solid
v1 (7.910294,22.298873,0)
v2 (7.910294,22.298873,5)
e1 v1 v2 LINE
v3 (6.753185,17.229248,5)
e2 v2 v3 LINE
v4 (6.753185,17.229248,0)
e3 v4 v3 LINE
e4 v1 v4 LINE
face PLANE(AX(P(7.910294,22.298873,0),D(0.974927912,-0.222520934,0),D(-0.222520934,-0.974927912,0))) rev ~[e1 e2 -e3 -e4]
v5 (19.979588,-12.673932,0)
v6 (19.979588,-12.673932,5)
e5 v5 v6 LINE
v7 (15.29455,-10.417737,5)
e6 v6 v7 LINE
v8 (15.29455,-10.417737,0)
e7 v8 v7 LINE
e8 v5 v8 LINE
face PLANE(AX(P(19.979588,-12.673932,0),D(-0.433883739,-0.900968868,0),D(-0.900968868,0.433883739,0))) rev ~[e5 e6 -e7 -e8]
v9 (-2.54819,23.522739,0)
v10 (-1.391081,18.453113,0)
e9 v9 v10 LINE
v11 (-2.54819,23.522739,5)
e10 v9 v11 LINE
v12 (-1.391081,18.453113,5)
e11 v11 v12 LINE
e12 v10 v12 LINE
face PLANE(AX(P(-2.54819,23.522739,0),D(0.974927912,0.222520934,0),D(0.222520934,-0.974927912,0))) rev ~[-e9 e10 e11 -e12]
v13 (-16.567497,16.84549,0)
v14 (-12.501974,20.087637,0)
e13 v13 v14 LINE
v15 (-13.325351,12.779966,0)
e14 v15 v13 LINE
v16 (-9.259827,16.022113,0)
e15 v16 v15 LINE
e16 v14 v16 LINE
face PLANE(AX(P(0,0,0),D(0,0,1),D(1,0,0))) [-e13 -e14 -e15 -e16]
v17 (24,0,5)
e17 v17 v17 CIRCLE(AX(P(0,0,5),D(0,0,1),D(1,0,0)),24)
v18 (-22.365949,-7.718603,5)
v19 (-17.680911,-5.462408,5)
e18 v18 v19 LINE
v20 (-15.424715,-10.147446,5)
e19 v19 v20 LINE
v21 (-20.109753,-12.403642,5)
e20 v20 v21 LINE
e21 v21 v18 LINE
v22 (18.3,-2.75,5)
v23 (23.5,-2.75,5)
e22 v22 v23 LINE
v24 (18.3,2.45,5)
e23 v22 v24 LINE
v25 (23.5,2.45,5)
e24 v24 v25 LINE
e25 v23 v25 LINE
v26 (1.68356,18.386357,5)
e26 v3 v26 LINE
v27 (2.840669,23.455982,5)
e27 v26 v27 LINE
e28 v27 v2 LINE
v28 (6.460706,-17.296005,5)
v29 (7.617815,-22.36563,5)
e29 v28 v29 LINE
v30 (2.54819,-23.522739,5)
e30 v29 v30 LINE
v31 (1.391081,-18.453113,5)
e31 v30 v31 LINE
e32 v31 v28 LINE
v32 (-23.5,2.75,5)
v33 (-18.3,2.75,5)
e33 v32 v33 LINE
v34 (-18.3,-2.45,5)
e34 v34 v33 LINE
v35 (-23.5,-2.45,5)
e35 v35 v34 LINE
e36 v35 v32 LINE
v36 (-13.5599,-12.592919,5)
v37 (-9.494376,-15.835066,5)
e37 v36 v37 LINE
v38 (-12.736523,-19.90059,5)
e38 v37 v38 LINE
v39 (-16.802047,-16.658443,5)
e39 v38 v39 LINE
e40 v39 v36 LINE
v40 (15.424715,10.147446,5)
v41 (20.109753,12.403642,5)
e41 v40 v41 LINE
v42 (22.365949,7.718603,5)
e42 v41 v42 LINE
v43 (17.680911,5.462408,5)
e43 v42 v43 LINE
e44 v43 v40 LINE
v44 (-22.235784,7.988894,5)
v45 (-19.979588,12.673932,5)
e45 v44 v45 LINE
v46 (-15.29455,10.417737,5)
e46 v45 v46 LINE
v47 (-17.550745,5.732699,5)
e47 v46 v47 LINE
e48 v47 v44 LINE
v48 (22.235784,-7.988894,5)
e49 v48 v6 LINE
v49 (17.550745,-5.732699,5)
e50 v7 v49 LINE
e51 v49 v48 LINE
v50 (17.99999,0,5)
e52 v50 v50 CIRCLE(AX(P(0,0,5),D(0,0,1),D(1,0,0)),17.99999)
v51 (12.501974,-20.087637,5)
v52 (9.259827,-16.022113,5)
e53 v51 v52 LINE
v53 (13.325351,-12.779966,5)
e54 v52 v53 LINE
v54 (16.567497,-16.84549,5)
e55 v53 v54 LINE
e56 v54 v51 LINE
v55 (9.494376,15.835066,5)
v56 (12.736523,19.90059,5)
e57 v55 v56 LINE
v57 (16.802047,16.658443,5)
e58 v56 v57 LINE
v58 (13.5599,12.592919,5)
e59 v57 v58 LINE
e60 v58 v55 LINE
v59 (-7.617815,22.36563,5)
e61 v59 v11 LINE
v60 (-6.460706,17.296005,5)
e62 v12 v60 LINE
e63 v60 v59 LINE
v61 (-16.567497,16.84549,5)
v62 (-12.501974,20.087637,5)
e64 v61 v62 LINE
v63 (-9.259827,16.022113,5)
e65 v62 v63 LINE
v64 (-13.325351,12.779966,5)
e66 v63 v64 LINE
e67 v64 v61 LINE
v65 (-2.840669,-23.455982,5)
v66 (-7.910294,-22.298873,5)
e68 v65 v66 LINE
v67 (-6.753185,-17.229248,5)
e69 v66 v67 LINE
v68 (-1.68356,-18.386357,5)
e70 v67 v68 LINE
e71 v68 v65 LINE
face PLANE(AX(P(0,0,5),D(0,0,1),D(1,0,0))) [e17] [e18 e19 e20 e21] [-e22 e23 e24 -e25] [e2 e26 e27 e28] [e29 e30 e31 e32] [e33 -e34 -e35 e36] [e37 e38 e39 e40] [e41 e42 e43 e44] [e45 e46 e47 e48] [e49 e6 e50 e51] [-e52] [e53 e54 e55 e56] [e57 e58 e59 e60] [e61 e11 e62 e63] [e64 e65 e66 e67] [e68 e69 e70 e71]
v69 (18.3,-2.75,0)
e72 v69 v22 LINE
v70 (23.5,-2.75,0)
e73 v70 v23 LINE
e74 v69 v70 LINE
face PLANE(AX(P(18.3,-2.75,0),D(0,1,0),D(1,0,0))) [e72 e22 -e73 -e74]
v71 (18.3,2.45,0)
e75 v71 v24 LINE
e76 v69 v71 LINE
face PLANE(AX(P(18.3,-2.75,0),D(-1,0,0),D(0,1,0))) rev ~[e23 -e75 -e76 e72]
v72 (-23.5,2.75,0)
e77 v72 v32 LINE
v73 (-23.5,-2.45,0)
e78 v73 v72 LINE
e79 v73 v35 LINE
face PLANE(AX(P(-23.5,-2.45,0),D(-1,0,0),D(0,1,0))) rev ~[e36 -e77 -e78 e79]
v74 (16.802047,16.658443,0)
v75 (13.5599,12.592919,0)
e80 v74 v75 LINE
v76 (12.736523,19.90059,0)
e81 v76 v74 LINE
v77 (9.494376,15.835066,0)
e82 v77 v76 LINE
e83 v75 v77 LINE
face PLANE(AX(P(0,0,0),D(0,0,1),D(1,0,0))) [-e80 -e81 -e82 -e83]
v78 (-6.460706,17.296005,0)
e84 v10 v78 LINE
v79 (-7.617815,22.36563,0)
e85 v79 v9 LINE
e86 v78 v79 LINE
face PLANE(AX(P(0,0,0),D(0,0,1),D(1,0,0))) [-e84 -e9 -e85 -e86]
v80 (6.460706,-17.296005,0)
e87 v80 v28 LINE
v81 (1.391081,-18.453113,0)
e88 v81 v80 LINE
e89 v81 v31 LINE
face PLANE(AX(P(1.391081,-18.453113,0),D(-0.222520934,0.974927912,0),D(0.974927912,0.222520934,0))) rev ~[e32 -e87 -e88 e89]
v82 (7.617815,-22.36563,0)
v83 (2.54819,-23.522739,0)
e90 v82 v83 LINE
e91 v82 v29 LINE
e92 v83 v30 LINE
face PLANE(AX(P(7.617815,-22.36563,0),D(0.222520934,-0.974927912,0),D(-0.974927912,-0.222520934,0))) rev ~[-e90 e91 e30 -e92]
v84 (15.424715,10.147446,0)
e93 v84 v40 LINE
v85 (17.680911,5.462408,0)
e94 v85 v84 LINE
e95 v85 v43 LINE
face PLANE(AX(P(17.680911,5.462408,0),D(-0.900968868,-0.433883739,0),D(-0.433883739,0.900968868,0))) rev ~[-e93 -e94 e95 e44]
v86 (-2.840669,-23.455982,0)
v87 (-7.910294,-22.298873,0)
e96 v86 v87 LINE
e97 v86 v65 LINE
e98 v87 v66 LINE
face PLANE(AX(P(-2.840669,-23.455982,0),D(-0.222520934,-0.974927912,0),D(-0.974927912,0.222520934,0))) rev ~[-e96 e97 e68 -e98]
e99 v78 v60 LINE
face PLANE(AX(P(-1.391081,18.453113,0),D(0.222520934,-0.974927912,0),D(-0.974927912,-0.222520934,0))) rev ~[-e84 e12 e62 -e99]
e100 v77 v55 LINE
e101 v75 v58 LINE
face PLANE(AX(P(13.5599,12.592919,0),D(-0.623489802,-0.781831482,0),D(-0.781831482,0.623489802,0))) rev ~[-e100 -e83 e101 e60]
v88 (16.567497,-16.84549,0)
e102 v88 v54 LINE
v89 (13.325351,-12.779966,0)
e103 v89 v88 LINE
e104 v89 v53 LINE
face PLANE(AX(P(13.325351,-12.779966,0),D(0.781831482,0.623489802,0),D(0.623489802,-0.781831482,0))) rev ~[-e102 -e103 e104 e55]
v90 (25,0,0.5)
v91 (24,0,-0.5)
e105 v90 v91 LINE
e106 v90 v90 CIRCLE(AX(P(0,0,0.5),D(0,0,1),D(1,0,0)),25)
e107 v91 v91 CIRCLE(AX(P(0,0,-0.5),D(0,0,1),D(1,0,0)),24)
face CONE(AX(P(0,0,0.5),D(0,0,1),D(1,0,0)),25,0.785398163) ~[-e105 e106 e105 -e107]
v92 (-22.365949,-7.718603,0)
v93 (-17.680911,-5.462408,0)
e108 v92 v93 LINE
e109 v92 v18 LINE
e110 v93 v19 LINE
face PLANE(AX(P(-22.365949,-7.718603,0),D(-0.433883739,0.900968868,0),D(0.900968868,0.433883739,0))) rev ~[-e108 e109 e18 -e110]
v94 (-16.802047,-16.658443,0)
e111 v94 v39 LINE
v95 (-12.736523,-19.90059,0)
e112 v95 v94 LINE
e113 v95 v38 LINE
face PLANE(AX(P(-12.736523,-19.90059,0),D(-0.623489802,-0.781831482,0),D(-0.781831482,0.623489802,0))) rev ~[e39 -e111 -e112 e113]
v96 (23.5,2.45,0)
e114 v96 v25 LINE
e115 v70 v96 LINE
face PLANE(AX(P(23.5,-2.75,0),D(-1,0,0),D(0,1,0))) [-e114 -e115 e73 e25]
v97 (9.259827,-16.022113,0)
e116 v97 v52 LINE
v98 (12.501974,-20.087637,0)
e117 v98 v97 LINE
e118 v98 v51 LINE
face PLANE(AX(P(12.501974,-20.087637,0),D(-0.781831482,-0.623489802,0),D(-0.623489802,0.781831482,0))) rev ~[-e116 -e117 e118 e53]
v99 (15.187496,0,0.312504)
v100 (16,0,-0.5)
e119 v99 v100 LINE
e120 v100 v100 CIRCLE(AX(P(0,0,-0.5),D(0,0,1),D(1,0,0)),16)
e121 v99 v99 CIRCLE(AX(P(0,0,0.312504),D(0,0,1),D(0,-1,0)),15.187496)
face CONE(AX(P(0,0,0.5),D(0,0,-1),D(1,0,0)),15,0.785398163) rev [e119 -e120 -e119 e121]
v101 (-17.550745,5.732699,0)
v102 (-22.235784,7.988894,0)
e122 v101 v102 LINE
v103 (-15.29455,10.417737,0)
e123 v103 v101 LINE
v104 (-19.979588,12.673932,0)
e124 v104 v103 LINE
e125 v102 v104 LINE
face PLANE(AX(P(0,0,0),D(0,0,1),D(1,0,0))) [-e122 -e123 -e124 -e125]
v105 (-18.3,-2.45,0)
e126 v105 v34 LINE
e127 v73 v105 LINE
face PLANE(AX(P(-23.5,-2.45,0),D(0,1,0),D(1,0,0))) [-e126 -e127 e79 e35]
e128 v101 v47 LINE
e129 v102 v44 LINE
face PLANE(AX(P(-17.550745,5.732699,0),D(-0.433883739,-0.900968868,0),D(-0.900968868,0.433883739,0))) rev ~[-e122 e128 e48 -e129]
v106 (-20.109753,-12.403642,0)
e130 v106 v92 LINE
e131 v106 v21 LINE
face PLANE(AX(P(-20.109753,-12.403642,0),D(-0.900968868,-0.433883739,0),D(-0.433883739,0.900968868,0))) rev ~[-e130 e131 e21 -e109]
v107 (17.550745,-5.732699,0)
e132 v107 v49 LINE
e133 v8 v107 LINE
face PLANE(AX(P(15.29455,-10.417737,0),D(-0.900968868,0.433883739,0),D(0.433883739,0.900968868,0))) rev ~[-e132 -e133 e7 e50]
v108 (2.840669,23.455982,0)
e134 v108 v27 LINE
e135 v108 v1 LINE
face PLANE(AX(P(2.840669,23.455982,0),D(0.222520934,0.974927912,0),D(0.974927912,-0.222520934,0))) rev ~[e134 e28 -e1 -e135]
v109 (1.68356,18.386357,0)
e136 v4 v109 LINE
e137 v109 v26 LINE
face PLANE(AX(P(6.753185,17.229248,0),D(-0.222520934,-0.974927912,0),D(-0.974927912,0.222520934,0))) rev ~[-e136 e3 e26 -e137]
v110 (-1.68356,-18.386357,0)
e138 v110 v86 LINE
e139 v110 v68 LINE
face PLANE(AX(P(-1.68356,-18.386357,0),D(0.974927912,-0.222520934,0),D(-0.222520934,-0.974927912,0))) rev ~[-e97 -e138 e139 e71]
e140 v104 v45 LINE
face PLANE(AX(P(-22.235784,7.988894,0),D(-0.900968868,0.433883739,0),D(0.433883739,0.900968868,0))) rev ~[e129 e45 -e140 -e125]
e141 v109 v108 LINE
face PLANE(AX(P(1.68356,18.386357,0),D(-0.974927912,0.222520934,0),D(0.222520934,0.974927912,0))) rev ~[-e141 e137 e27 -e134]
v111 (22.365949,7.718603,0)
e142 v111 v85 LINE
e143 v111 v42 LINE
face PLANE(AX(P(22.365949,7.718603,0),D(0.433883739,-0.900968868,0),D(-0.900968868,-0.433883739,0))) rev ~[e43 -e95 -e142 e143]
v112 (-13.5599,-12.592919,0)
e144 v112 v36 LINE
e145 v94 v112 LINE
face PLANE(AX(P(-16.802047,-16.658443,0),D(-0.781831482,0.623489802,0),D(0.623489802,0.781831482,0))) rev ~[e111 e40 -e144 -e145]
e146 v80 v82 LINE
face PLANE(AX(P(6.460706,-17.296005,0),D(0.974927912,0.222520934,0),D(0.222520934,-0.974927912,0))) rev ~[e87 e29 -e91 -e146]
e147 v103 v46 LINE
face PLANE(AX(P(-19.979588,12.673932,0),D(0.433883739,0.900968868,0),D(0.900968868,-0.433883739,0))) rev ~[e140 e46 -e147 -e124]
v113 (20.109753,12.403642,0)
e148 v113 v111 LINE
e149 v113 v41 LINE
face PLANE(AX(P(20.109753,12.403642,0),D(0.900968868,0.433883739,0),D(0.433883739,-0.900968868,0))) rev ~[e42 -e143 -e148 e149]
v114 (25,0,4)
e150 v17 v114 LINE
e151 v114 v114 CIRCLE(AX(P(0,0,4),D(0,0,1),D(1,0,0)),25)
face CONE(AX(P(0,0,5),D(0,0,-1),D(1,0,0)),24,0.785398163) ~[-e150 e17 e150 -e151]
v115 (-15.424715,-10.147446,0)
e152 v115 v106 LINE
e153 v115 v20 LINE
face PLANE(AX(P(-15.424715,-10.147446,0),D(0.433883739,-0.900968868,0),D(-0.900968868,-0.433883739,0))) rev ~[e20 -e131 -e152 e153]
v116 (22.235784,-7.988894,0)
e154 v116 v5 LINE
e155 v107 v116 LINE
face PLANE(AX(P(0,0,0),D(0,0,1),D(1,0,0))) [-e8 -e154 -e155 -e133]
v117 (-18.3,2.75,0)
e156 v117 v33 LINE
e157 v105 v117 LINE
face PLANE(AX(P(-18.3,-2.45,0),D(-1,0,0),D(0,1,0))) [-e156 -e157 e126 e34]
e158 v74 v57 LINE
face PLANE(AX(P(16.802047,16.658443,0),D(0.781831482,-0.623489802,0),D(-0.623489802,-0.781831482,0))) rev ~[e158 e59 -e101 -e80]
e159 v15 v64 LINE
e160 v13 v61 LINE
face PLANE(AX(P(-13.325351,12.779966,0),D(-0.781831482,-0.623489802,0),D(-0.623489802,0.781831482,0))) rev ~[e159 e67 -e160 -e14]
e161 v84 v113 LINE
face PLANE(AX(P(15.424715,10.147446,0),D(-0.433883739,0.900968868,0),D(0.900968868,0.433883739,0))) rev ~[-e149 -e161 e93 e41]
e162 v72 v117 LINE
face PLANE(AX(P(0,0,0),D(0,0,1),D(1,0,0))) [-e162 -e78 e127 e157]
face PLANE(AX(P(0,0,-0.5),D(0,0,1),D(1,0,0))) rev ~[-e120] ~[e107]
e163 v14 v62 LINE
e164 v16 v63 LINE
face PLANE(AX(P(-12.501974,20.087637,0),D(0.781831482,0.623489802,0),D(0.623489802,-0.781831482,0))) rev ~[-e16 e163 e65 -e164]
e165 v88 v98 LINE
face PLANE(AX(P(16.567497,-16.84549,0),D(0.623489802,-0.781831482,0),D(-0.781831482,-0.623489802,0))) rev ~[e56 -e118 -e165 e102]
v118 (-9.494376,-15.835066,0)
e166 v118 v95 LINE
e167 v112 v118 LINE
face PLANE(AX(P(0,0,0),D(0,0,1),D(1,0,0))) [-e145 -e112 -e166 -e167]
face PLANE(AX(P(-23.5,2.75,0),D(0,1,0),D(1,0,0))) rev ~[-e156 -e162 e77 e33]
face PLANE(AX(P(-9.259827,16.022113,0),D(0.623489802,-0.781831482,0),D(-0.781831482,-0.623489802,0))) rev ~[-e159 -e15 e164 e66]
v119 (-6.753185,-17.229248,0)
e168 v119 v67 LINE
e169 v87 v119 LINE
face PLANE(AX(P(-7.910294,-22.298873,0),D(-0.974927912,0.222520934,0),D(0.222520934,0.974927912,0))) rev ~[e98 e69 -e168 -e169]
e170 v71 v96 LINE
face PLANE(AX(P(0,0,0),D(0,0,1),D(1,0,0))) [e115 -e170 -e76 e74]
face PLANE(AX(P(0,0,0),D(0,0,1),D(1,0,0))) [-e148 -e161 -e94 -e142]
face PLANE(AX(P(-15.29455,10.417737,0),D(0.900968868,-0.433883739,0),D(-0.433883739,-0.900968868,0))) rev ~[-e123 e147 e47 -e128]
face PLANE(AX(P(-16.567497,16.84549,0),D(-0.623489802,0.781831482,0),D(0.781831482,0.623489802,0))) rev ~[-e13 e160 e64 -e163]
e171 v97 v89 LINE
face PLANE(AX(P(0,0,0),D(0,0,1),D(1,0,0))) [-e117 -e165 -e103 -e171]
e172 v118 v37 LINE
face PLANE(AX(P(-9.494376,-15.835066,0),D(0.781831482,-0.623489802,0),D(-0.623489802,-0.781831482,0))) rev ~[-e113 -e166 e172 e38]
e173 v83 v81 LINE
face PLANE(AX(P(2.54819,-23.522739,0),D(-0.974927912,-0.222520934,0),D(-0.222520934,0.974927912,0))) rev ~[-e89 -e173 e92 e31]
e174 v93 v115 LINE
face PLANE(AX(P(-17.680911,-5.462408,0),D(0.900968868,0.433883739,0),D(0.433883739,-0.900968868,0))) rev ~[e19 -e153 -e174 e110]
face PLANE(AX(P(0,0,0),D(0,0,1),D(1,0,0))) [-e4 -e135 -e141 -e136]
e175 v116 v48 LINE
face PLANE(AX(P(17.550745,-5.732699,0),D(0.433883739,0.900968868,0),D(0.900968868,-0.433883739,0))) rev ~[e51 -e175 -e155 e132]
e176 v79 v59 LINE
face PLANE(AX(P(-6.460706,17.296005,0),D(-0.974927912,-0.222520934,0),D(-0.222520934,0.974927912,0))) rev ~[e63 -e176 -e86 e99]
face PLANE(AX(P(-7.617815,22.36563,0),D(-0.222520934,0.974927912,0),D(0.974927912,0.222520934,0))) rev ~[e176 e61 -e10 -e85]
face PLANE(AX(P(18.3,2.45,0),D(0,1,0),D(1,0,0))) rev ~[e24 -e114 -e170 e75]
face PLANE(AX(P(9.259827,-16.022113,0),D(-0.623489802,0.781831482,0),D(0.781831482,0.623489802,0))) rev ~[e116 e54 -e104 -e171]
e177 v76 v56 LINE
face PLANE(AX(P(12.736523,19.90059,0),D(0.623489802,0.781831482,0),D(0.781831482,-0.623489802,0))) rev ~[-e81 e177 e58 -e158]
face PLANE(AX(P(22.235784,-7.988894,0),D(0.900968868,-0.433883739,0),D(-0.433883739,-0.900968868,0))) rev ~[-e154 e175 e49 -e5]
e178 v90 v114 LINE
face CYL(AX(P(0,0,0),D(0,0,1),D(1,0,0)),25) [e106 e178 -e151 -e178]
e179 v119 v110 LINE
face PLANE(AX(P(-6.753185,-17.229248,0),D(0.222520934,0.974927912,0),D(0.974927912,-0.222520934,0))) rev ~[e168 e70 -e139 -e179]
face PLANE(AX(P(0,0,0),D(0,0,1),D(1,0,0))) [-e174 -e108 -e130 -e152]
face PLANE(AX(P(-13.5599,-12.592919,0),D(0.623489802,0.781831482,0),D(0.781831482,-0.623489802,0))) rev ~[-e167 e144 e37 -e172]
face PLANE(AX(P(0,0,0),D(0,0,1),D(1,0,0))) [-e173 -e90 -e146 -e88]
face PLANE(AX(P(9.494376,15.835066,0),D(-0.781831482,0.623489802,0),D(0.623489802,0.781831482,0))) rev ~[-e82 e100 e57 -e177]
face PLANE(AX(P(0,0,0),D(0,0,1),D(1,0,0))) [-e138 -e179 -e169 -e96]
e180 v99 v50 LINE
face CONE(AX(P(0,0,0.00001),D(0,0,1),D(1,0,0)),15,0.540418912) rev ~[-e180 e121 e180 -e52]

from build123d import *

# Parameters (mm, degrees)
F0_R     = 25
F0_W     = 5.2
F0_H     = 5.2
F0_R_2   = 15
F1_DEPTH = 5
F2_DEPTH = 0.5
F3_SIZE2 = 2.99999
F3_SIZE  = 4.99999


# Not quite as in the source:
# - a fillet or chamfer that OpenCascade refuses, or shapes differently, is made with other operations: its cross-section is extruded or revolved along the edge and cut away or added
# - a fillet or chamfer is up to 0.001 mm smaller than in the source, because OpenCascade refuses the exact size


with BuildPart() as f1:
    # F0 (on Top) → F1 (new body)
    with BuildSketch(Plane.XY):
        Circle(F0_R)
        Polygon((-12.7365232116, -19.9005898526), (-16.8020469205, -16.6584428829), (-13.5598999508, -12.5929191741), (-9.494376242, -15.8350661437), align=None, mode=Mode.SUBTRACT)
        Polygon((-2.8406685631, -23.4559822245), (-7.9102937065, -22.2988733679), (-6.7531848499, -17.2292482245), (-1.6835597066, -18.3863570811), align=None, mode=Mode.SUBTRACT)
        Polygon((-20.1097532349, -12.4036415956), (-22.3659486783, -7.7186034825), (-17.6809105652, -5.4624080391), (-15.4247151218, -10.1474461522), align=None, mode=Mode.SUBTRACT)
        Polygon((7.6178153328, -22.3656296481), (2.5481901895, -23.5227385047), (1.3910813329, -18.4531133613), (6.4607064762, -17.2960045047), align=None, mode=Mode.SUBTRACT)
        Polygon((16.5674974757, -16.8454898234), (12.5019737669, -20.0876367931), (9.2598267972, -16.0221130843), (13.3253505061, -12.7799661146), align=None, mode=Mode.SUBTRACT)
        Polygon((22.2357835565, -7.9888941429), (19.9795881131, -12.673932256), (15.29455, -10.4177368126), (17.5507454435, -5.7326986995), align=None, mode=Mode.SUBTRACT)
        with Locations((20.9, -0.15)):
            Rectangle(F0_W, F0_H, mode=Mode.SUBTRACT)
        with Locations((-20.9, 0.15)):
            Rectangle(F0_W, F0_H, mode=Mode.SUBTRACT)
        Polygon((-22.2357835565, 7.9888941429), (-19.9795881131, 12.673932256), (-15.29455, 10.4177368126), (-17.5507454435, 5.7326986995), align=None, mode=Mode.SUBTRACT)
        Polygon((-16.5674974757, 16.8454898234), (-12.5019737669, 20.0876367931), (-9.2598267972, 16.0221130843), (-13.3253505061, 12.7799661146), align=None, mode=Mode.SUBTRACT)
        Polygon((-7.6178153328, 22.3656296481), (-2.5481901895, 23.5227385047), (-1.3910813329, 18.4531133613), (-6.4607064762, 17.2960045047), align=None, mode=Mode.SUBTRACT)
        Circle(F0_R_2, mode=Mode.SUBTRACT)
        Polygon((20.1097532349, 12.4036415956), (22.3659486783, 7.7186034825), (17.6809105652, 5.4624080391), (15.4247151218, 10.1474461522), align=None, mode=Mode.SUBTRACT)
        Polygon((2.8406685631, 23.4559822245), (7.9102937065, 22.2988733679), (6.7531848499, 17.2292482245), (1.6835597066, 18.3863570811), align=None, mode=Mode.SUBTRACT)
        Polygon((12.7365232116, 19.9005898526), (16.8020469205, 16.6584428829), (13.5598999508, 12.5929191741), (9.494376242, 15.8350661437), align=None, mode=Mode.SUBTRACT)
    extrude(amount=F1_DEPTH)

    # F0 (on Top) → F2 (join)
    with BuildSketch(Plane.XY):
        Circle(F0_R)
        Polygon((-12.7365232116, -19.9005898526), (-16.8020469205, -16.6584428829), (-13.5598999508, -12.5929191741), (-9.494376242, -15.8350661437), align=None, mode=Mode.SUBTRACT)
        Polygon((-2.8406685631, -23.4559822245), (-7.9102937065, -22.2988733679), (-6.7531848499, -17.2292482245), (-1.6835597066, -18.3863570811), align=None, mode=Mode.SUBTRACT)
        Polygon((-20.1097532349, -12.4036415956), (-22.3659486783, -7.7186034825), (-17.6809105652, -5.4624080391), (-15.4247151218, -10.1474461522), align=None, mode=Mode.SUBTRACT)
        Polygon((7.6178153328, -22.3656296481), (2.5481901895, -23.5227385047), (1.3910813329, -18.4531133613), (6.4607064762, -17.2960045047), align=None, mode=Mode.SUBTRACT)
        Polygon((16.5674974757, -16.8454898234), (12.5019737669, -20.0876367931), (9.2598267972, -16.0221130843), (13.3253505061, -12.7799661146), align=None, mode=Mode.SUBTRACT)
        Polygon((22.2357835565, -7.9888941429), (19.9795881131, -12.673932256), (15.29455, -10.4177368126), (17.5507454435, -5.7326986995), align=None, mode=Mode.SUBTRACT)
        with Locations((20.9, -0.15)):
            Rectangle(F0_W, F0_H, mode=Mode.SUBTRACT)
        with Locations((-20.9, 0.15)):
            Rectangle(F0_W, F0_H, mode=Mode.SUBTRACT)
        Polygon((-22.2357835565, 7.9888941429), (-19.9795881131, 12.673932256), (-15.29455, 10.4177368126), (-17.5507454435, 5.7326986995), align=None, mode=Mode.SUBTRACT)
        Polygon((-16.5674974757, 16.8454898234), (-12.5019737669, 20.0876367931), (-9.2598267972, 16.0221130843), (-13.3253505061, 12.7799661146), align=None, mode=Mode.SUBTRACT)
        Polygon((-7.6178153328, 22.3656296481), (-2.5481901895, 23.5227385047), (-1.3910813329, 18.4531133613), (-6.4607064762, 17.2960045047), align=None, mode=Mode.SUBTRACT)
        Circle(F0_R_2, mode=Mode.SUBTRACT)
        Polygon((20.1097532349, 12.4036415956), (22.3659486783, 7.7186034825), (17.6809105652, 5.4624080391), (15.4247151218, 10.1474461522), align=None, mode=Mode.SUBTRACT)
        Polygon((2.8406685631, 23.4559822245), (7.9102937065, 22.2988733679), (6.7531848499, 17.2292482245), (1.6835597066, 18.3863570811), align=None, mode=Mode.SUBTRACT)
        Polygon((12.7365232116, 19.9005898526), (16.8020469205, 16.6584428829), (13.5598999508, 12.5929191741), (9.494376242, 15.8350661437), align=None, mode=Mode.SUBTRACT)
        Polygon((-15.29455, 10.4177368126), (-19.9795881131, 12.673932256), (-22.2357835565, 7.9888941429), (-17.5507454435, 5.7326986995), align=None)
        Polygon((-9.2598267972, 16.0221130843), (-12.5019737669, 20.0876367931), (-16.5674974757, 16.8454898234), (-13.3253505061, 12.7799661146), align=None)
        Polygon((-1.3910813329, 18.4531133613), (-2.5481901895, 23.5227385047), (-7.6178153328, 22.3656296481), (-6.4607064762, 17.2960045047), align=None)
        Polygon((6.7531848499, 17.2292482245), (7.9102937065, 22.2988733679), (2.8406685631, 23.4559822245), (1.6835597066, 18.3863570811), align=None)
        Polygon((13.5598999508, 12.5929191741), (16.8020469205, 16.6584428829), (12.7365232116, 19.9005898526), (9.494376242, 15.8350661437), align=None)
        Polygon((17.6809105652, 5.4624080391), (22.3659486783, 7.7186034825), (20.1097532349, 12.4036415956), (15.4247151218, 10.1474461522), align=None)
        with Locations((20.9, -0.15)):
            Rectangle(F0_W, F0_H)
        Polygon((15.29455, -10.4177368126), (19.9795881131, -12.673932256), (22.2357835565, -7.9888941429), (17.5507454435, -5.7326986995), align=None)
        Polygon((9.2598267972, -16.0221130843), (12.5019737669, -20.0876367931), (16.5674974757, -16.8454898234), (13.3253505061, -12.7799661146), align=None)
        with Locations((-20.9, 0.15)):
            Rectangle(F0_W, F0_H)
        Polygon((-13.5598999508, -12.5929191741), (-16.8020469205, -16.6584428829), (-12.7365232116, -19.9005898526), (-9.494376242, -15.8350661437), align=None)
        Polygon((-17.6809105652, -5.4624080391), (-22.3659486783, -7.7186034825), (-20.1097532349, -12.4036415956), (-15.4247151218, -10.1474461522), align=None)
        Polygon((-6.7531848499, -17.2292482245), (-7.9102937065, -22.2988733679), (-2.8406685631, -23.4559822245), (-1.6835597066, -18.3863570811), align=None)
        Polygon((1.3910813329, -18.4531133613), (2.5481901895, -23.5227385047), (7.6178153328, -22.3656296481), (6.4607064762, -17.2960045047), align=None)
    extrude(amount=-F2_DEPTH)

    # F3 (size 5 and 3 in the source; OpenCascade refuses exactly that, so slightly less here)
    f3_edges = [f1.edges().sort_by_distance(p)[0] for p in [
        (-15, 0, 5),
    ]]
    f3_side = f1.faces().sort_by_distance((-15, 0, 2.5))[0]
    chamfer(f3_edges, length=F3_SIZE, length2=F3_SIZE2, reference=f3_side)

    # F4: chamfer of 1 on 3 edges, made by hand

    # F4_s1 → F4_t2 (revolve, cut)
    with BuildSketch(Plane.XZ):
        Polygon((24, 5), (25, 4), (25, 5), align=None)
    revolve(axis=Axis((0, 0, 5), (0, 0, 1)), mode=Mode.SUBTRACT)

    # F4_s3 → F4_t4 (revolve, cut)
    with BuildSketch(Plane.XZ):
        Polygon((25, 0.5), (24, -0.5), (25, -0.5), align=None)
    revolve(axis=Axis((0, 0, -0.5), (0, 0, 1)), mode=Mode.SUBTRACT)

    # F4_s5 → F4_t6 (revolve, cut)
    with BuildSketch(Plane.XZ):
        Polygon((15, 0.5), (16, -0.5), (15, -0.5), align=None)
    revolve(axis=Axis((0, 0, -0.5), (0, 0, 1)), mode=Mode.SUBTRACT)


solid = f1.part
